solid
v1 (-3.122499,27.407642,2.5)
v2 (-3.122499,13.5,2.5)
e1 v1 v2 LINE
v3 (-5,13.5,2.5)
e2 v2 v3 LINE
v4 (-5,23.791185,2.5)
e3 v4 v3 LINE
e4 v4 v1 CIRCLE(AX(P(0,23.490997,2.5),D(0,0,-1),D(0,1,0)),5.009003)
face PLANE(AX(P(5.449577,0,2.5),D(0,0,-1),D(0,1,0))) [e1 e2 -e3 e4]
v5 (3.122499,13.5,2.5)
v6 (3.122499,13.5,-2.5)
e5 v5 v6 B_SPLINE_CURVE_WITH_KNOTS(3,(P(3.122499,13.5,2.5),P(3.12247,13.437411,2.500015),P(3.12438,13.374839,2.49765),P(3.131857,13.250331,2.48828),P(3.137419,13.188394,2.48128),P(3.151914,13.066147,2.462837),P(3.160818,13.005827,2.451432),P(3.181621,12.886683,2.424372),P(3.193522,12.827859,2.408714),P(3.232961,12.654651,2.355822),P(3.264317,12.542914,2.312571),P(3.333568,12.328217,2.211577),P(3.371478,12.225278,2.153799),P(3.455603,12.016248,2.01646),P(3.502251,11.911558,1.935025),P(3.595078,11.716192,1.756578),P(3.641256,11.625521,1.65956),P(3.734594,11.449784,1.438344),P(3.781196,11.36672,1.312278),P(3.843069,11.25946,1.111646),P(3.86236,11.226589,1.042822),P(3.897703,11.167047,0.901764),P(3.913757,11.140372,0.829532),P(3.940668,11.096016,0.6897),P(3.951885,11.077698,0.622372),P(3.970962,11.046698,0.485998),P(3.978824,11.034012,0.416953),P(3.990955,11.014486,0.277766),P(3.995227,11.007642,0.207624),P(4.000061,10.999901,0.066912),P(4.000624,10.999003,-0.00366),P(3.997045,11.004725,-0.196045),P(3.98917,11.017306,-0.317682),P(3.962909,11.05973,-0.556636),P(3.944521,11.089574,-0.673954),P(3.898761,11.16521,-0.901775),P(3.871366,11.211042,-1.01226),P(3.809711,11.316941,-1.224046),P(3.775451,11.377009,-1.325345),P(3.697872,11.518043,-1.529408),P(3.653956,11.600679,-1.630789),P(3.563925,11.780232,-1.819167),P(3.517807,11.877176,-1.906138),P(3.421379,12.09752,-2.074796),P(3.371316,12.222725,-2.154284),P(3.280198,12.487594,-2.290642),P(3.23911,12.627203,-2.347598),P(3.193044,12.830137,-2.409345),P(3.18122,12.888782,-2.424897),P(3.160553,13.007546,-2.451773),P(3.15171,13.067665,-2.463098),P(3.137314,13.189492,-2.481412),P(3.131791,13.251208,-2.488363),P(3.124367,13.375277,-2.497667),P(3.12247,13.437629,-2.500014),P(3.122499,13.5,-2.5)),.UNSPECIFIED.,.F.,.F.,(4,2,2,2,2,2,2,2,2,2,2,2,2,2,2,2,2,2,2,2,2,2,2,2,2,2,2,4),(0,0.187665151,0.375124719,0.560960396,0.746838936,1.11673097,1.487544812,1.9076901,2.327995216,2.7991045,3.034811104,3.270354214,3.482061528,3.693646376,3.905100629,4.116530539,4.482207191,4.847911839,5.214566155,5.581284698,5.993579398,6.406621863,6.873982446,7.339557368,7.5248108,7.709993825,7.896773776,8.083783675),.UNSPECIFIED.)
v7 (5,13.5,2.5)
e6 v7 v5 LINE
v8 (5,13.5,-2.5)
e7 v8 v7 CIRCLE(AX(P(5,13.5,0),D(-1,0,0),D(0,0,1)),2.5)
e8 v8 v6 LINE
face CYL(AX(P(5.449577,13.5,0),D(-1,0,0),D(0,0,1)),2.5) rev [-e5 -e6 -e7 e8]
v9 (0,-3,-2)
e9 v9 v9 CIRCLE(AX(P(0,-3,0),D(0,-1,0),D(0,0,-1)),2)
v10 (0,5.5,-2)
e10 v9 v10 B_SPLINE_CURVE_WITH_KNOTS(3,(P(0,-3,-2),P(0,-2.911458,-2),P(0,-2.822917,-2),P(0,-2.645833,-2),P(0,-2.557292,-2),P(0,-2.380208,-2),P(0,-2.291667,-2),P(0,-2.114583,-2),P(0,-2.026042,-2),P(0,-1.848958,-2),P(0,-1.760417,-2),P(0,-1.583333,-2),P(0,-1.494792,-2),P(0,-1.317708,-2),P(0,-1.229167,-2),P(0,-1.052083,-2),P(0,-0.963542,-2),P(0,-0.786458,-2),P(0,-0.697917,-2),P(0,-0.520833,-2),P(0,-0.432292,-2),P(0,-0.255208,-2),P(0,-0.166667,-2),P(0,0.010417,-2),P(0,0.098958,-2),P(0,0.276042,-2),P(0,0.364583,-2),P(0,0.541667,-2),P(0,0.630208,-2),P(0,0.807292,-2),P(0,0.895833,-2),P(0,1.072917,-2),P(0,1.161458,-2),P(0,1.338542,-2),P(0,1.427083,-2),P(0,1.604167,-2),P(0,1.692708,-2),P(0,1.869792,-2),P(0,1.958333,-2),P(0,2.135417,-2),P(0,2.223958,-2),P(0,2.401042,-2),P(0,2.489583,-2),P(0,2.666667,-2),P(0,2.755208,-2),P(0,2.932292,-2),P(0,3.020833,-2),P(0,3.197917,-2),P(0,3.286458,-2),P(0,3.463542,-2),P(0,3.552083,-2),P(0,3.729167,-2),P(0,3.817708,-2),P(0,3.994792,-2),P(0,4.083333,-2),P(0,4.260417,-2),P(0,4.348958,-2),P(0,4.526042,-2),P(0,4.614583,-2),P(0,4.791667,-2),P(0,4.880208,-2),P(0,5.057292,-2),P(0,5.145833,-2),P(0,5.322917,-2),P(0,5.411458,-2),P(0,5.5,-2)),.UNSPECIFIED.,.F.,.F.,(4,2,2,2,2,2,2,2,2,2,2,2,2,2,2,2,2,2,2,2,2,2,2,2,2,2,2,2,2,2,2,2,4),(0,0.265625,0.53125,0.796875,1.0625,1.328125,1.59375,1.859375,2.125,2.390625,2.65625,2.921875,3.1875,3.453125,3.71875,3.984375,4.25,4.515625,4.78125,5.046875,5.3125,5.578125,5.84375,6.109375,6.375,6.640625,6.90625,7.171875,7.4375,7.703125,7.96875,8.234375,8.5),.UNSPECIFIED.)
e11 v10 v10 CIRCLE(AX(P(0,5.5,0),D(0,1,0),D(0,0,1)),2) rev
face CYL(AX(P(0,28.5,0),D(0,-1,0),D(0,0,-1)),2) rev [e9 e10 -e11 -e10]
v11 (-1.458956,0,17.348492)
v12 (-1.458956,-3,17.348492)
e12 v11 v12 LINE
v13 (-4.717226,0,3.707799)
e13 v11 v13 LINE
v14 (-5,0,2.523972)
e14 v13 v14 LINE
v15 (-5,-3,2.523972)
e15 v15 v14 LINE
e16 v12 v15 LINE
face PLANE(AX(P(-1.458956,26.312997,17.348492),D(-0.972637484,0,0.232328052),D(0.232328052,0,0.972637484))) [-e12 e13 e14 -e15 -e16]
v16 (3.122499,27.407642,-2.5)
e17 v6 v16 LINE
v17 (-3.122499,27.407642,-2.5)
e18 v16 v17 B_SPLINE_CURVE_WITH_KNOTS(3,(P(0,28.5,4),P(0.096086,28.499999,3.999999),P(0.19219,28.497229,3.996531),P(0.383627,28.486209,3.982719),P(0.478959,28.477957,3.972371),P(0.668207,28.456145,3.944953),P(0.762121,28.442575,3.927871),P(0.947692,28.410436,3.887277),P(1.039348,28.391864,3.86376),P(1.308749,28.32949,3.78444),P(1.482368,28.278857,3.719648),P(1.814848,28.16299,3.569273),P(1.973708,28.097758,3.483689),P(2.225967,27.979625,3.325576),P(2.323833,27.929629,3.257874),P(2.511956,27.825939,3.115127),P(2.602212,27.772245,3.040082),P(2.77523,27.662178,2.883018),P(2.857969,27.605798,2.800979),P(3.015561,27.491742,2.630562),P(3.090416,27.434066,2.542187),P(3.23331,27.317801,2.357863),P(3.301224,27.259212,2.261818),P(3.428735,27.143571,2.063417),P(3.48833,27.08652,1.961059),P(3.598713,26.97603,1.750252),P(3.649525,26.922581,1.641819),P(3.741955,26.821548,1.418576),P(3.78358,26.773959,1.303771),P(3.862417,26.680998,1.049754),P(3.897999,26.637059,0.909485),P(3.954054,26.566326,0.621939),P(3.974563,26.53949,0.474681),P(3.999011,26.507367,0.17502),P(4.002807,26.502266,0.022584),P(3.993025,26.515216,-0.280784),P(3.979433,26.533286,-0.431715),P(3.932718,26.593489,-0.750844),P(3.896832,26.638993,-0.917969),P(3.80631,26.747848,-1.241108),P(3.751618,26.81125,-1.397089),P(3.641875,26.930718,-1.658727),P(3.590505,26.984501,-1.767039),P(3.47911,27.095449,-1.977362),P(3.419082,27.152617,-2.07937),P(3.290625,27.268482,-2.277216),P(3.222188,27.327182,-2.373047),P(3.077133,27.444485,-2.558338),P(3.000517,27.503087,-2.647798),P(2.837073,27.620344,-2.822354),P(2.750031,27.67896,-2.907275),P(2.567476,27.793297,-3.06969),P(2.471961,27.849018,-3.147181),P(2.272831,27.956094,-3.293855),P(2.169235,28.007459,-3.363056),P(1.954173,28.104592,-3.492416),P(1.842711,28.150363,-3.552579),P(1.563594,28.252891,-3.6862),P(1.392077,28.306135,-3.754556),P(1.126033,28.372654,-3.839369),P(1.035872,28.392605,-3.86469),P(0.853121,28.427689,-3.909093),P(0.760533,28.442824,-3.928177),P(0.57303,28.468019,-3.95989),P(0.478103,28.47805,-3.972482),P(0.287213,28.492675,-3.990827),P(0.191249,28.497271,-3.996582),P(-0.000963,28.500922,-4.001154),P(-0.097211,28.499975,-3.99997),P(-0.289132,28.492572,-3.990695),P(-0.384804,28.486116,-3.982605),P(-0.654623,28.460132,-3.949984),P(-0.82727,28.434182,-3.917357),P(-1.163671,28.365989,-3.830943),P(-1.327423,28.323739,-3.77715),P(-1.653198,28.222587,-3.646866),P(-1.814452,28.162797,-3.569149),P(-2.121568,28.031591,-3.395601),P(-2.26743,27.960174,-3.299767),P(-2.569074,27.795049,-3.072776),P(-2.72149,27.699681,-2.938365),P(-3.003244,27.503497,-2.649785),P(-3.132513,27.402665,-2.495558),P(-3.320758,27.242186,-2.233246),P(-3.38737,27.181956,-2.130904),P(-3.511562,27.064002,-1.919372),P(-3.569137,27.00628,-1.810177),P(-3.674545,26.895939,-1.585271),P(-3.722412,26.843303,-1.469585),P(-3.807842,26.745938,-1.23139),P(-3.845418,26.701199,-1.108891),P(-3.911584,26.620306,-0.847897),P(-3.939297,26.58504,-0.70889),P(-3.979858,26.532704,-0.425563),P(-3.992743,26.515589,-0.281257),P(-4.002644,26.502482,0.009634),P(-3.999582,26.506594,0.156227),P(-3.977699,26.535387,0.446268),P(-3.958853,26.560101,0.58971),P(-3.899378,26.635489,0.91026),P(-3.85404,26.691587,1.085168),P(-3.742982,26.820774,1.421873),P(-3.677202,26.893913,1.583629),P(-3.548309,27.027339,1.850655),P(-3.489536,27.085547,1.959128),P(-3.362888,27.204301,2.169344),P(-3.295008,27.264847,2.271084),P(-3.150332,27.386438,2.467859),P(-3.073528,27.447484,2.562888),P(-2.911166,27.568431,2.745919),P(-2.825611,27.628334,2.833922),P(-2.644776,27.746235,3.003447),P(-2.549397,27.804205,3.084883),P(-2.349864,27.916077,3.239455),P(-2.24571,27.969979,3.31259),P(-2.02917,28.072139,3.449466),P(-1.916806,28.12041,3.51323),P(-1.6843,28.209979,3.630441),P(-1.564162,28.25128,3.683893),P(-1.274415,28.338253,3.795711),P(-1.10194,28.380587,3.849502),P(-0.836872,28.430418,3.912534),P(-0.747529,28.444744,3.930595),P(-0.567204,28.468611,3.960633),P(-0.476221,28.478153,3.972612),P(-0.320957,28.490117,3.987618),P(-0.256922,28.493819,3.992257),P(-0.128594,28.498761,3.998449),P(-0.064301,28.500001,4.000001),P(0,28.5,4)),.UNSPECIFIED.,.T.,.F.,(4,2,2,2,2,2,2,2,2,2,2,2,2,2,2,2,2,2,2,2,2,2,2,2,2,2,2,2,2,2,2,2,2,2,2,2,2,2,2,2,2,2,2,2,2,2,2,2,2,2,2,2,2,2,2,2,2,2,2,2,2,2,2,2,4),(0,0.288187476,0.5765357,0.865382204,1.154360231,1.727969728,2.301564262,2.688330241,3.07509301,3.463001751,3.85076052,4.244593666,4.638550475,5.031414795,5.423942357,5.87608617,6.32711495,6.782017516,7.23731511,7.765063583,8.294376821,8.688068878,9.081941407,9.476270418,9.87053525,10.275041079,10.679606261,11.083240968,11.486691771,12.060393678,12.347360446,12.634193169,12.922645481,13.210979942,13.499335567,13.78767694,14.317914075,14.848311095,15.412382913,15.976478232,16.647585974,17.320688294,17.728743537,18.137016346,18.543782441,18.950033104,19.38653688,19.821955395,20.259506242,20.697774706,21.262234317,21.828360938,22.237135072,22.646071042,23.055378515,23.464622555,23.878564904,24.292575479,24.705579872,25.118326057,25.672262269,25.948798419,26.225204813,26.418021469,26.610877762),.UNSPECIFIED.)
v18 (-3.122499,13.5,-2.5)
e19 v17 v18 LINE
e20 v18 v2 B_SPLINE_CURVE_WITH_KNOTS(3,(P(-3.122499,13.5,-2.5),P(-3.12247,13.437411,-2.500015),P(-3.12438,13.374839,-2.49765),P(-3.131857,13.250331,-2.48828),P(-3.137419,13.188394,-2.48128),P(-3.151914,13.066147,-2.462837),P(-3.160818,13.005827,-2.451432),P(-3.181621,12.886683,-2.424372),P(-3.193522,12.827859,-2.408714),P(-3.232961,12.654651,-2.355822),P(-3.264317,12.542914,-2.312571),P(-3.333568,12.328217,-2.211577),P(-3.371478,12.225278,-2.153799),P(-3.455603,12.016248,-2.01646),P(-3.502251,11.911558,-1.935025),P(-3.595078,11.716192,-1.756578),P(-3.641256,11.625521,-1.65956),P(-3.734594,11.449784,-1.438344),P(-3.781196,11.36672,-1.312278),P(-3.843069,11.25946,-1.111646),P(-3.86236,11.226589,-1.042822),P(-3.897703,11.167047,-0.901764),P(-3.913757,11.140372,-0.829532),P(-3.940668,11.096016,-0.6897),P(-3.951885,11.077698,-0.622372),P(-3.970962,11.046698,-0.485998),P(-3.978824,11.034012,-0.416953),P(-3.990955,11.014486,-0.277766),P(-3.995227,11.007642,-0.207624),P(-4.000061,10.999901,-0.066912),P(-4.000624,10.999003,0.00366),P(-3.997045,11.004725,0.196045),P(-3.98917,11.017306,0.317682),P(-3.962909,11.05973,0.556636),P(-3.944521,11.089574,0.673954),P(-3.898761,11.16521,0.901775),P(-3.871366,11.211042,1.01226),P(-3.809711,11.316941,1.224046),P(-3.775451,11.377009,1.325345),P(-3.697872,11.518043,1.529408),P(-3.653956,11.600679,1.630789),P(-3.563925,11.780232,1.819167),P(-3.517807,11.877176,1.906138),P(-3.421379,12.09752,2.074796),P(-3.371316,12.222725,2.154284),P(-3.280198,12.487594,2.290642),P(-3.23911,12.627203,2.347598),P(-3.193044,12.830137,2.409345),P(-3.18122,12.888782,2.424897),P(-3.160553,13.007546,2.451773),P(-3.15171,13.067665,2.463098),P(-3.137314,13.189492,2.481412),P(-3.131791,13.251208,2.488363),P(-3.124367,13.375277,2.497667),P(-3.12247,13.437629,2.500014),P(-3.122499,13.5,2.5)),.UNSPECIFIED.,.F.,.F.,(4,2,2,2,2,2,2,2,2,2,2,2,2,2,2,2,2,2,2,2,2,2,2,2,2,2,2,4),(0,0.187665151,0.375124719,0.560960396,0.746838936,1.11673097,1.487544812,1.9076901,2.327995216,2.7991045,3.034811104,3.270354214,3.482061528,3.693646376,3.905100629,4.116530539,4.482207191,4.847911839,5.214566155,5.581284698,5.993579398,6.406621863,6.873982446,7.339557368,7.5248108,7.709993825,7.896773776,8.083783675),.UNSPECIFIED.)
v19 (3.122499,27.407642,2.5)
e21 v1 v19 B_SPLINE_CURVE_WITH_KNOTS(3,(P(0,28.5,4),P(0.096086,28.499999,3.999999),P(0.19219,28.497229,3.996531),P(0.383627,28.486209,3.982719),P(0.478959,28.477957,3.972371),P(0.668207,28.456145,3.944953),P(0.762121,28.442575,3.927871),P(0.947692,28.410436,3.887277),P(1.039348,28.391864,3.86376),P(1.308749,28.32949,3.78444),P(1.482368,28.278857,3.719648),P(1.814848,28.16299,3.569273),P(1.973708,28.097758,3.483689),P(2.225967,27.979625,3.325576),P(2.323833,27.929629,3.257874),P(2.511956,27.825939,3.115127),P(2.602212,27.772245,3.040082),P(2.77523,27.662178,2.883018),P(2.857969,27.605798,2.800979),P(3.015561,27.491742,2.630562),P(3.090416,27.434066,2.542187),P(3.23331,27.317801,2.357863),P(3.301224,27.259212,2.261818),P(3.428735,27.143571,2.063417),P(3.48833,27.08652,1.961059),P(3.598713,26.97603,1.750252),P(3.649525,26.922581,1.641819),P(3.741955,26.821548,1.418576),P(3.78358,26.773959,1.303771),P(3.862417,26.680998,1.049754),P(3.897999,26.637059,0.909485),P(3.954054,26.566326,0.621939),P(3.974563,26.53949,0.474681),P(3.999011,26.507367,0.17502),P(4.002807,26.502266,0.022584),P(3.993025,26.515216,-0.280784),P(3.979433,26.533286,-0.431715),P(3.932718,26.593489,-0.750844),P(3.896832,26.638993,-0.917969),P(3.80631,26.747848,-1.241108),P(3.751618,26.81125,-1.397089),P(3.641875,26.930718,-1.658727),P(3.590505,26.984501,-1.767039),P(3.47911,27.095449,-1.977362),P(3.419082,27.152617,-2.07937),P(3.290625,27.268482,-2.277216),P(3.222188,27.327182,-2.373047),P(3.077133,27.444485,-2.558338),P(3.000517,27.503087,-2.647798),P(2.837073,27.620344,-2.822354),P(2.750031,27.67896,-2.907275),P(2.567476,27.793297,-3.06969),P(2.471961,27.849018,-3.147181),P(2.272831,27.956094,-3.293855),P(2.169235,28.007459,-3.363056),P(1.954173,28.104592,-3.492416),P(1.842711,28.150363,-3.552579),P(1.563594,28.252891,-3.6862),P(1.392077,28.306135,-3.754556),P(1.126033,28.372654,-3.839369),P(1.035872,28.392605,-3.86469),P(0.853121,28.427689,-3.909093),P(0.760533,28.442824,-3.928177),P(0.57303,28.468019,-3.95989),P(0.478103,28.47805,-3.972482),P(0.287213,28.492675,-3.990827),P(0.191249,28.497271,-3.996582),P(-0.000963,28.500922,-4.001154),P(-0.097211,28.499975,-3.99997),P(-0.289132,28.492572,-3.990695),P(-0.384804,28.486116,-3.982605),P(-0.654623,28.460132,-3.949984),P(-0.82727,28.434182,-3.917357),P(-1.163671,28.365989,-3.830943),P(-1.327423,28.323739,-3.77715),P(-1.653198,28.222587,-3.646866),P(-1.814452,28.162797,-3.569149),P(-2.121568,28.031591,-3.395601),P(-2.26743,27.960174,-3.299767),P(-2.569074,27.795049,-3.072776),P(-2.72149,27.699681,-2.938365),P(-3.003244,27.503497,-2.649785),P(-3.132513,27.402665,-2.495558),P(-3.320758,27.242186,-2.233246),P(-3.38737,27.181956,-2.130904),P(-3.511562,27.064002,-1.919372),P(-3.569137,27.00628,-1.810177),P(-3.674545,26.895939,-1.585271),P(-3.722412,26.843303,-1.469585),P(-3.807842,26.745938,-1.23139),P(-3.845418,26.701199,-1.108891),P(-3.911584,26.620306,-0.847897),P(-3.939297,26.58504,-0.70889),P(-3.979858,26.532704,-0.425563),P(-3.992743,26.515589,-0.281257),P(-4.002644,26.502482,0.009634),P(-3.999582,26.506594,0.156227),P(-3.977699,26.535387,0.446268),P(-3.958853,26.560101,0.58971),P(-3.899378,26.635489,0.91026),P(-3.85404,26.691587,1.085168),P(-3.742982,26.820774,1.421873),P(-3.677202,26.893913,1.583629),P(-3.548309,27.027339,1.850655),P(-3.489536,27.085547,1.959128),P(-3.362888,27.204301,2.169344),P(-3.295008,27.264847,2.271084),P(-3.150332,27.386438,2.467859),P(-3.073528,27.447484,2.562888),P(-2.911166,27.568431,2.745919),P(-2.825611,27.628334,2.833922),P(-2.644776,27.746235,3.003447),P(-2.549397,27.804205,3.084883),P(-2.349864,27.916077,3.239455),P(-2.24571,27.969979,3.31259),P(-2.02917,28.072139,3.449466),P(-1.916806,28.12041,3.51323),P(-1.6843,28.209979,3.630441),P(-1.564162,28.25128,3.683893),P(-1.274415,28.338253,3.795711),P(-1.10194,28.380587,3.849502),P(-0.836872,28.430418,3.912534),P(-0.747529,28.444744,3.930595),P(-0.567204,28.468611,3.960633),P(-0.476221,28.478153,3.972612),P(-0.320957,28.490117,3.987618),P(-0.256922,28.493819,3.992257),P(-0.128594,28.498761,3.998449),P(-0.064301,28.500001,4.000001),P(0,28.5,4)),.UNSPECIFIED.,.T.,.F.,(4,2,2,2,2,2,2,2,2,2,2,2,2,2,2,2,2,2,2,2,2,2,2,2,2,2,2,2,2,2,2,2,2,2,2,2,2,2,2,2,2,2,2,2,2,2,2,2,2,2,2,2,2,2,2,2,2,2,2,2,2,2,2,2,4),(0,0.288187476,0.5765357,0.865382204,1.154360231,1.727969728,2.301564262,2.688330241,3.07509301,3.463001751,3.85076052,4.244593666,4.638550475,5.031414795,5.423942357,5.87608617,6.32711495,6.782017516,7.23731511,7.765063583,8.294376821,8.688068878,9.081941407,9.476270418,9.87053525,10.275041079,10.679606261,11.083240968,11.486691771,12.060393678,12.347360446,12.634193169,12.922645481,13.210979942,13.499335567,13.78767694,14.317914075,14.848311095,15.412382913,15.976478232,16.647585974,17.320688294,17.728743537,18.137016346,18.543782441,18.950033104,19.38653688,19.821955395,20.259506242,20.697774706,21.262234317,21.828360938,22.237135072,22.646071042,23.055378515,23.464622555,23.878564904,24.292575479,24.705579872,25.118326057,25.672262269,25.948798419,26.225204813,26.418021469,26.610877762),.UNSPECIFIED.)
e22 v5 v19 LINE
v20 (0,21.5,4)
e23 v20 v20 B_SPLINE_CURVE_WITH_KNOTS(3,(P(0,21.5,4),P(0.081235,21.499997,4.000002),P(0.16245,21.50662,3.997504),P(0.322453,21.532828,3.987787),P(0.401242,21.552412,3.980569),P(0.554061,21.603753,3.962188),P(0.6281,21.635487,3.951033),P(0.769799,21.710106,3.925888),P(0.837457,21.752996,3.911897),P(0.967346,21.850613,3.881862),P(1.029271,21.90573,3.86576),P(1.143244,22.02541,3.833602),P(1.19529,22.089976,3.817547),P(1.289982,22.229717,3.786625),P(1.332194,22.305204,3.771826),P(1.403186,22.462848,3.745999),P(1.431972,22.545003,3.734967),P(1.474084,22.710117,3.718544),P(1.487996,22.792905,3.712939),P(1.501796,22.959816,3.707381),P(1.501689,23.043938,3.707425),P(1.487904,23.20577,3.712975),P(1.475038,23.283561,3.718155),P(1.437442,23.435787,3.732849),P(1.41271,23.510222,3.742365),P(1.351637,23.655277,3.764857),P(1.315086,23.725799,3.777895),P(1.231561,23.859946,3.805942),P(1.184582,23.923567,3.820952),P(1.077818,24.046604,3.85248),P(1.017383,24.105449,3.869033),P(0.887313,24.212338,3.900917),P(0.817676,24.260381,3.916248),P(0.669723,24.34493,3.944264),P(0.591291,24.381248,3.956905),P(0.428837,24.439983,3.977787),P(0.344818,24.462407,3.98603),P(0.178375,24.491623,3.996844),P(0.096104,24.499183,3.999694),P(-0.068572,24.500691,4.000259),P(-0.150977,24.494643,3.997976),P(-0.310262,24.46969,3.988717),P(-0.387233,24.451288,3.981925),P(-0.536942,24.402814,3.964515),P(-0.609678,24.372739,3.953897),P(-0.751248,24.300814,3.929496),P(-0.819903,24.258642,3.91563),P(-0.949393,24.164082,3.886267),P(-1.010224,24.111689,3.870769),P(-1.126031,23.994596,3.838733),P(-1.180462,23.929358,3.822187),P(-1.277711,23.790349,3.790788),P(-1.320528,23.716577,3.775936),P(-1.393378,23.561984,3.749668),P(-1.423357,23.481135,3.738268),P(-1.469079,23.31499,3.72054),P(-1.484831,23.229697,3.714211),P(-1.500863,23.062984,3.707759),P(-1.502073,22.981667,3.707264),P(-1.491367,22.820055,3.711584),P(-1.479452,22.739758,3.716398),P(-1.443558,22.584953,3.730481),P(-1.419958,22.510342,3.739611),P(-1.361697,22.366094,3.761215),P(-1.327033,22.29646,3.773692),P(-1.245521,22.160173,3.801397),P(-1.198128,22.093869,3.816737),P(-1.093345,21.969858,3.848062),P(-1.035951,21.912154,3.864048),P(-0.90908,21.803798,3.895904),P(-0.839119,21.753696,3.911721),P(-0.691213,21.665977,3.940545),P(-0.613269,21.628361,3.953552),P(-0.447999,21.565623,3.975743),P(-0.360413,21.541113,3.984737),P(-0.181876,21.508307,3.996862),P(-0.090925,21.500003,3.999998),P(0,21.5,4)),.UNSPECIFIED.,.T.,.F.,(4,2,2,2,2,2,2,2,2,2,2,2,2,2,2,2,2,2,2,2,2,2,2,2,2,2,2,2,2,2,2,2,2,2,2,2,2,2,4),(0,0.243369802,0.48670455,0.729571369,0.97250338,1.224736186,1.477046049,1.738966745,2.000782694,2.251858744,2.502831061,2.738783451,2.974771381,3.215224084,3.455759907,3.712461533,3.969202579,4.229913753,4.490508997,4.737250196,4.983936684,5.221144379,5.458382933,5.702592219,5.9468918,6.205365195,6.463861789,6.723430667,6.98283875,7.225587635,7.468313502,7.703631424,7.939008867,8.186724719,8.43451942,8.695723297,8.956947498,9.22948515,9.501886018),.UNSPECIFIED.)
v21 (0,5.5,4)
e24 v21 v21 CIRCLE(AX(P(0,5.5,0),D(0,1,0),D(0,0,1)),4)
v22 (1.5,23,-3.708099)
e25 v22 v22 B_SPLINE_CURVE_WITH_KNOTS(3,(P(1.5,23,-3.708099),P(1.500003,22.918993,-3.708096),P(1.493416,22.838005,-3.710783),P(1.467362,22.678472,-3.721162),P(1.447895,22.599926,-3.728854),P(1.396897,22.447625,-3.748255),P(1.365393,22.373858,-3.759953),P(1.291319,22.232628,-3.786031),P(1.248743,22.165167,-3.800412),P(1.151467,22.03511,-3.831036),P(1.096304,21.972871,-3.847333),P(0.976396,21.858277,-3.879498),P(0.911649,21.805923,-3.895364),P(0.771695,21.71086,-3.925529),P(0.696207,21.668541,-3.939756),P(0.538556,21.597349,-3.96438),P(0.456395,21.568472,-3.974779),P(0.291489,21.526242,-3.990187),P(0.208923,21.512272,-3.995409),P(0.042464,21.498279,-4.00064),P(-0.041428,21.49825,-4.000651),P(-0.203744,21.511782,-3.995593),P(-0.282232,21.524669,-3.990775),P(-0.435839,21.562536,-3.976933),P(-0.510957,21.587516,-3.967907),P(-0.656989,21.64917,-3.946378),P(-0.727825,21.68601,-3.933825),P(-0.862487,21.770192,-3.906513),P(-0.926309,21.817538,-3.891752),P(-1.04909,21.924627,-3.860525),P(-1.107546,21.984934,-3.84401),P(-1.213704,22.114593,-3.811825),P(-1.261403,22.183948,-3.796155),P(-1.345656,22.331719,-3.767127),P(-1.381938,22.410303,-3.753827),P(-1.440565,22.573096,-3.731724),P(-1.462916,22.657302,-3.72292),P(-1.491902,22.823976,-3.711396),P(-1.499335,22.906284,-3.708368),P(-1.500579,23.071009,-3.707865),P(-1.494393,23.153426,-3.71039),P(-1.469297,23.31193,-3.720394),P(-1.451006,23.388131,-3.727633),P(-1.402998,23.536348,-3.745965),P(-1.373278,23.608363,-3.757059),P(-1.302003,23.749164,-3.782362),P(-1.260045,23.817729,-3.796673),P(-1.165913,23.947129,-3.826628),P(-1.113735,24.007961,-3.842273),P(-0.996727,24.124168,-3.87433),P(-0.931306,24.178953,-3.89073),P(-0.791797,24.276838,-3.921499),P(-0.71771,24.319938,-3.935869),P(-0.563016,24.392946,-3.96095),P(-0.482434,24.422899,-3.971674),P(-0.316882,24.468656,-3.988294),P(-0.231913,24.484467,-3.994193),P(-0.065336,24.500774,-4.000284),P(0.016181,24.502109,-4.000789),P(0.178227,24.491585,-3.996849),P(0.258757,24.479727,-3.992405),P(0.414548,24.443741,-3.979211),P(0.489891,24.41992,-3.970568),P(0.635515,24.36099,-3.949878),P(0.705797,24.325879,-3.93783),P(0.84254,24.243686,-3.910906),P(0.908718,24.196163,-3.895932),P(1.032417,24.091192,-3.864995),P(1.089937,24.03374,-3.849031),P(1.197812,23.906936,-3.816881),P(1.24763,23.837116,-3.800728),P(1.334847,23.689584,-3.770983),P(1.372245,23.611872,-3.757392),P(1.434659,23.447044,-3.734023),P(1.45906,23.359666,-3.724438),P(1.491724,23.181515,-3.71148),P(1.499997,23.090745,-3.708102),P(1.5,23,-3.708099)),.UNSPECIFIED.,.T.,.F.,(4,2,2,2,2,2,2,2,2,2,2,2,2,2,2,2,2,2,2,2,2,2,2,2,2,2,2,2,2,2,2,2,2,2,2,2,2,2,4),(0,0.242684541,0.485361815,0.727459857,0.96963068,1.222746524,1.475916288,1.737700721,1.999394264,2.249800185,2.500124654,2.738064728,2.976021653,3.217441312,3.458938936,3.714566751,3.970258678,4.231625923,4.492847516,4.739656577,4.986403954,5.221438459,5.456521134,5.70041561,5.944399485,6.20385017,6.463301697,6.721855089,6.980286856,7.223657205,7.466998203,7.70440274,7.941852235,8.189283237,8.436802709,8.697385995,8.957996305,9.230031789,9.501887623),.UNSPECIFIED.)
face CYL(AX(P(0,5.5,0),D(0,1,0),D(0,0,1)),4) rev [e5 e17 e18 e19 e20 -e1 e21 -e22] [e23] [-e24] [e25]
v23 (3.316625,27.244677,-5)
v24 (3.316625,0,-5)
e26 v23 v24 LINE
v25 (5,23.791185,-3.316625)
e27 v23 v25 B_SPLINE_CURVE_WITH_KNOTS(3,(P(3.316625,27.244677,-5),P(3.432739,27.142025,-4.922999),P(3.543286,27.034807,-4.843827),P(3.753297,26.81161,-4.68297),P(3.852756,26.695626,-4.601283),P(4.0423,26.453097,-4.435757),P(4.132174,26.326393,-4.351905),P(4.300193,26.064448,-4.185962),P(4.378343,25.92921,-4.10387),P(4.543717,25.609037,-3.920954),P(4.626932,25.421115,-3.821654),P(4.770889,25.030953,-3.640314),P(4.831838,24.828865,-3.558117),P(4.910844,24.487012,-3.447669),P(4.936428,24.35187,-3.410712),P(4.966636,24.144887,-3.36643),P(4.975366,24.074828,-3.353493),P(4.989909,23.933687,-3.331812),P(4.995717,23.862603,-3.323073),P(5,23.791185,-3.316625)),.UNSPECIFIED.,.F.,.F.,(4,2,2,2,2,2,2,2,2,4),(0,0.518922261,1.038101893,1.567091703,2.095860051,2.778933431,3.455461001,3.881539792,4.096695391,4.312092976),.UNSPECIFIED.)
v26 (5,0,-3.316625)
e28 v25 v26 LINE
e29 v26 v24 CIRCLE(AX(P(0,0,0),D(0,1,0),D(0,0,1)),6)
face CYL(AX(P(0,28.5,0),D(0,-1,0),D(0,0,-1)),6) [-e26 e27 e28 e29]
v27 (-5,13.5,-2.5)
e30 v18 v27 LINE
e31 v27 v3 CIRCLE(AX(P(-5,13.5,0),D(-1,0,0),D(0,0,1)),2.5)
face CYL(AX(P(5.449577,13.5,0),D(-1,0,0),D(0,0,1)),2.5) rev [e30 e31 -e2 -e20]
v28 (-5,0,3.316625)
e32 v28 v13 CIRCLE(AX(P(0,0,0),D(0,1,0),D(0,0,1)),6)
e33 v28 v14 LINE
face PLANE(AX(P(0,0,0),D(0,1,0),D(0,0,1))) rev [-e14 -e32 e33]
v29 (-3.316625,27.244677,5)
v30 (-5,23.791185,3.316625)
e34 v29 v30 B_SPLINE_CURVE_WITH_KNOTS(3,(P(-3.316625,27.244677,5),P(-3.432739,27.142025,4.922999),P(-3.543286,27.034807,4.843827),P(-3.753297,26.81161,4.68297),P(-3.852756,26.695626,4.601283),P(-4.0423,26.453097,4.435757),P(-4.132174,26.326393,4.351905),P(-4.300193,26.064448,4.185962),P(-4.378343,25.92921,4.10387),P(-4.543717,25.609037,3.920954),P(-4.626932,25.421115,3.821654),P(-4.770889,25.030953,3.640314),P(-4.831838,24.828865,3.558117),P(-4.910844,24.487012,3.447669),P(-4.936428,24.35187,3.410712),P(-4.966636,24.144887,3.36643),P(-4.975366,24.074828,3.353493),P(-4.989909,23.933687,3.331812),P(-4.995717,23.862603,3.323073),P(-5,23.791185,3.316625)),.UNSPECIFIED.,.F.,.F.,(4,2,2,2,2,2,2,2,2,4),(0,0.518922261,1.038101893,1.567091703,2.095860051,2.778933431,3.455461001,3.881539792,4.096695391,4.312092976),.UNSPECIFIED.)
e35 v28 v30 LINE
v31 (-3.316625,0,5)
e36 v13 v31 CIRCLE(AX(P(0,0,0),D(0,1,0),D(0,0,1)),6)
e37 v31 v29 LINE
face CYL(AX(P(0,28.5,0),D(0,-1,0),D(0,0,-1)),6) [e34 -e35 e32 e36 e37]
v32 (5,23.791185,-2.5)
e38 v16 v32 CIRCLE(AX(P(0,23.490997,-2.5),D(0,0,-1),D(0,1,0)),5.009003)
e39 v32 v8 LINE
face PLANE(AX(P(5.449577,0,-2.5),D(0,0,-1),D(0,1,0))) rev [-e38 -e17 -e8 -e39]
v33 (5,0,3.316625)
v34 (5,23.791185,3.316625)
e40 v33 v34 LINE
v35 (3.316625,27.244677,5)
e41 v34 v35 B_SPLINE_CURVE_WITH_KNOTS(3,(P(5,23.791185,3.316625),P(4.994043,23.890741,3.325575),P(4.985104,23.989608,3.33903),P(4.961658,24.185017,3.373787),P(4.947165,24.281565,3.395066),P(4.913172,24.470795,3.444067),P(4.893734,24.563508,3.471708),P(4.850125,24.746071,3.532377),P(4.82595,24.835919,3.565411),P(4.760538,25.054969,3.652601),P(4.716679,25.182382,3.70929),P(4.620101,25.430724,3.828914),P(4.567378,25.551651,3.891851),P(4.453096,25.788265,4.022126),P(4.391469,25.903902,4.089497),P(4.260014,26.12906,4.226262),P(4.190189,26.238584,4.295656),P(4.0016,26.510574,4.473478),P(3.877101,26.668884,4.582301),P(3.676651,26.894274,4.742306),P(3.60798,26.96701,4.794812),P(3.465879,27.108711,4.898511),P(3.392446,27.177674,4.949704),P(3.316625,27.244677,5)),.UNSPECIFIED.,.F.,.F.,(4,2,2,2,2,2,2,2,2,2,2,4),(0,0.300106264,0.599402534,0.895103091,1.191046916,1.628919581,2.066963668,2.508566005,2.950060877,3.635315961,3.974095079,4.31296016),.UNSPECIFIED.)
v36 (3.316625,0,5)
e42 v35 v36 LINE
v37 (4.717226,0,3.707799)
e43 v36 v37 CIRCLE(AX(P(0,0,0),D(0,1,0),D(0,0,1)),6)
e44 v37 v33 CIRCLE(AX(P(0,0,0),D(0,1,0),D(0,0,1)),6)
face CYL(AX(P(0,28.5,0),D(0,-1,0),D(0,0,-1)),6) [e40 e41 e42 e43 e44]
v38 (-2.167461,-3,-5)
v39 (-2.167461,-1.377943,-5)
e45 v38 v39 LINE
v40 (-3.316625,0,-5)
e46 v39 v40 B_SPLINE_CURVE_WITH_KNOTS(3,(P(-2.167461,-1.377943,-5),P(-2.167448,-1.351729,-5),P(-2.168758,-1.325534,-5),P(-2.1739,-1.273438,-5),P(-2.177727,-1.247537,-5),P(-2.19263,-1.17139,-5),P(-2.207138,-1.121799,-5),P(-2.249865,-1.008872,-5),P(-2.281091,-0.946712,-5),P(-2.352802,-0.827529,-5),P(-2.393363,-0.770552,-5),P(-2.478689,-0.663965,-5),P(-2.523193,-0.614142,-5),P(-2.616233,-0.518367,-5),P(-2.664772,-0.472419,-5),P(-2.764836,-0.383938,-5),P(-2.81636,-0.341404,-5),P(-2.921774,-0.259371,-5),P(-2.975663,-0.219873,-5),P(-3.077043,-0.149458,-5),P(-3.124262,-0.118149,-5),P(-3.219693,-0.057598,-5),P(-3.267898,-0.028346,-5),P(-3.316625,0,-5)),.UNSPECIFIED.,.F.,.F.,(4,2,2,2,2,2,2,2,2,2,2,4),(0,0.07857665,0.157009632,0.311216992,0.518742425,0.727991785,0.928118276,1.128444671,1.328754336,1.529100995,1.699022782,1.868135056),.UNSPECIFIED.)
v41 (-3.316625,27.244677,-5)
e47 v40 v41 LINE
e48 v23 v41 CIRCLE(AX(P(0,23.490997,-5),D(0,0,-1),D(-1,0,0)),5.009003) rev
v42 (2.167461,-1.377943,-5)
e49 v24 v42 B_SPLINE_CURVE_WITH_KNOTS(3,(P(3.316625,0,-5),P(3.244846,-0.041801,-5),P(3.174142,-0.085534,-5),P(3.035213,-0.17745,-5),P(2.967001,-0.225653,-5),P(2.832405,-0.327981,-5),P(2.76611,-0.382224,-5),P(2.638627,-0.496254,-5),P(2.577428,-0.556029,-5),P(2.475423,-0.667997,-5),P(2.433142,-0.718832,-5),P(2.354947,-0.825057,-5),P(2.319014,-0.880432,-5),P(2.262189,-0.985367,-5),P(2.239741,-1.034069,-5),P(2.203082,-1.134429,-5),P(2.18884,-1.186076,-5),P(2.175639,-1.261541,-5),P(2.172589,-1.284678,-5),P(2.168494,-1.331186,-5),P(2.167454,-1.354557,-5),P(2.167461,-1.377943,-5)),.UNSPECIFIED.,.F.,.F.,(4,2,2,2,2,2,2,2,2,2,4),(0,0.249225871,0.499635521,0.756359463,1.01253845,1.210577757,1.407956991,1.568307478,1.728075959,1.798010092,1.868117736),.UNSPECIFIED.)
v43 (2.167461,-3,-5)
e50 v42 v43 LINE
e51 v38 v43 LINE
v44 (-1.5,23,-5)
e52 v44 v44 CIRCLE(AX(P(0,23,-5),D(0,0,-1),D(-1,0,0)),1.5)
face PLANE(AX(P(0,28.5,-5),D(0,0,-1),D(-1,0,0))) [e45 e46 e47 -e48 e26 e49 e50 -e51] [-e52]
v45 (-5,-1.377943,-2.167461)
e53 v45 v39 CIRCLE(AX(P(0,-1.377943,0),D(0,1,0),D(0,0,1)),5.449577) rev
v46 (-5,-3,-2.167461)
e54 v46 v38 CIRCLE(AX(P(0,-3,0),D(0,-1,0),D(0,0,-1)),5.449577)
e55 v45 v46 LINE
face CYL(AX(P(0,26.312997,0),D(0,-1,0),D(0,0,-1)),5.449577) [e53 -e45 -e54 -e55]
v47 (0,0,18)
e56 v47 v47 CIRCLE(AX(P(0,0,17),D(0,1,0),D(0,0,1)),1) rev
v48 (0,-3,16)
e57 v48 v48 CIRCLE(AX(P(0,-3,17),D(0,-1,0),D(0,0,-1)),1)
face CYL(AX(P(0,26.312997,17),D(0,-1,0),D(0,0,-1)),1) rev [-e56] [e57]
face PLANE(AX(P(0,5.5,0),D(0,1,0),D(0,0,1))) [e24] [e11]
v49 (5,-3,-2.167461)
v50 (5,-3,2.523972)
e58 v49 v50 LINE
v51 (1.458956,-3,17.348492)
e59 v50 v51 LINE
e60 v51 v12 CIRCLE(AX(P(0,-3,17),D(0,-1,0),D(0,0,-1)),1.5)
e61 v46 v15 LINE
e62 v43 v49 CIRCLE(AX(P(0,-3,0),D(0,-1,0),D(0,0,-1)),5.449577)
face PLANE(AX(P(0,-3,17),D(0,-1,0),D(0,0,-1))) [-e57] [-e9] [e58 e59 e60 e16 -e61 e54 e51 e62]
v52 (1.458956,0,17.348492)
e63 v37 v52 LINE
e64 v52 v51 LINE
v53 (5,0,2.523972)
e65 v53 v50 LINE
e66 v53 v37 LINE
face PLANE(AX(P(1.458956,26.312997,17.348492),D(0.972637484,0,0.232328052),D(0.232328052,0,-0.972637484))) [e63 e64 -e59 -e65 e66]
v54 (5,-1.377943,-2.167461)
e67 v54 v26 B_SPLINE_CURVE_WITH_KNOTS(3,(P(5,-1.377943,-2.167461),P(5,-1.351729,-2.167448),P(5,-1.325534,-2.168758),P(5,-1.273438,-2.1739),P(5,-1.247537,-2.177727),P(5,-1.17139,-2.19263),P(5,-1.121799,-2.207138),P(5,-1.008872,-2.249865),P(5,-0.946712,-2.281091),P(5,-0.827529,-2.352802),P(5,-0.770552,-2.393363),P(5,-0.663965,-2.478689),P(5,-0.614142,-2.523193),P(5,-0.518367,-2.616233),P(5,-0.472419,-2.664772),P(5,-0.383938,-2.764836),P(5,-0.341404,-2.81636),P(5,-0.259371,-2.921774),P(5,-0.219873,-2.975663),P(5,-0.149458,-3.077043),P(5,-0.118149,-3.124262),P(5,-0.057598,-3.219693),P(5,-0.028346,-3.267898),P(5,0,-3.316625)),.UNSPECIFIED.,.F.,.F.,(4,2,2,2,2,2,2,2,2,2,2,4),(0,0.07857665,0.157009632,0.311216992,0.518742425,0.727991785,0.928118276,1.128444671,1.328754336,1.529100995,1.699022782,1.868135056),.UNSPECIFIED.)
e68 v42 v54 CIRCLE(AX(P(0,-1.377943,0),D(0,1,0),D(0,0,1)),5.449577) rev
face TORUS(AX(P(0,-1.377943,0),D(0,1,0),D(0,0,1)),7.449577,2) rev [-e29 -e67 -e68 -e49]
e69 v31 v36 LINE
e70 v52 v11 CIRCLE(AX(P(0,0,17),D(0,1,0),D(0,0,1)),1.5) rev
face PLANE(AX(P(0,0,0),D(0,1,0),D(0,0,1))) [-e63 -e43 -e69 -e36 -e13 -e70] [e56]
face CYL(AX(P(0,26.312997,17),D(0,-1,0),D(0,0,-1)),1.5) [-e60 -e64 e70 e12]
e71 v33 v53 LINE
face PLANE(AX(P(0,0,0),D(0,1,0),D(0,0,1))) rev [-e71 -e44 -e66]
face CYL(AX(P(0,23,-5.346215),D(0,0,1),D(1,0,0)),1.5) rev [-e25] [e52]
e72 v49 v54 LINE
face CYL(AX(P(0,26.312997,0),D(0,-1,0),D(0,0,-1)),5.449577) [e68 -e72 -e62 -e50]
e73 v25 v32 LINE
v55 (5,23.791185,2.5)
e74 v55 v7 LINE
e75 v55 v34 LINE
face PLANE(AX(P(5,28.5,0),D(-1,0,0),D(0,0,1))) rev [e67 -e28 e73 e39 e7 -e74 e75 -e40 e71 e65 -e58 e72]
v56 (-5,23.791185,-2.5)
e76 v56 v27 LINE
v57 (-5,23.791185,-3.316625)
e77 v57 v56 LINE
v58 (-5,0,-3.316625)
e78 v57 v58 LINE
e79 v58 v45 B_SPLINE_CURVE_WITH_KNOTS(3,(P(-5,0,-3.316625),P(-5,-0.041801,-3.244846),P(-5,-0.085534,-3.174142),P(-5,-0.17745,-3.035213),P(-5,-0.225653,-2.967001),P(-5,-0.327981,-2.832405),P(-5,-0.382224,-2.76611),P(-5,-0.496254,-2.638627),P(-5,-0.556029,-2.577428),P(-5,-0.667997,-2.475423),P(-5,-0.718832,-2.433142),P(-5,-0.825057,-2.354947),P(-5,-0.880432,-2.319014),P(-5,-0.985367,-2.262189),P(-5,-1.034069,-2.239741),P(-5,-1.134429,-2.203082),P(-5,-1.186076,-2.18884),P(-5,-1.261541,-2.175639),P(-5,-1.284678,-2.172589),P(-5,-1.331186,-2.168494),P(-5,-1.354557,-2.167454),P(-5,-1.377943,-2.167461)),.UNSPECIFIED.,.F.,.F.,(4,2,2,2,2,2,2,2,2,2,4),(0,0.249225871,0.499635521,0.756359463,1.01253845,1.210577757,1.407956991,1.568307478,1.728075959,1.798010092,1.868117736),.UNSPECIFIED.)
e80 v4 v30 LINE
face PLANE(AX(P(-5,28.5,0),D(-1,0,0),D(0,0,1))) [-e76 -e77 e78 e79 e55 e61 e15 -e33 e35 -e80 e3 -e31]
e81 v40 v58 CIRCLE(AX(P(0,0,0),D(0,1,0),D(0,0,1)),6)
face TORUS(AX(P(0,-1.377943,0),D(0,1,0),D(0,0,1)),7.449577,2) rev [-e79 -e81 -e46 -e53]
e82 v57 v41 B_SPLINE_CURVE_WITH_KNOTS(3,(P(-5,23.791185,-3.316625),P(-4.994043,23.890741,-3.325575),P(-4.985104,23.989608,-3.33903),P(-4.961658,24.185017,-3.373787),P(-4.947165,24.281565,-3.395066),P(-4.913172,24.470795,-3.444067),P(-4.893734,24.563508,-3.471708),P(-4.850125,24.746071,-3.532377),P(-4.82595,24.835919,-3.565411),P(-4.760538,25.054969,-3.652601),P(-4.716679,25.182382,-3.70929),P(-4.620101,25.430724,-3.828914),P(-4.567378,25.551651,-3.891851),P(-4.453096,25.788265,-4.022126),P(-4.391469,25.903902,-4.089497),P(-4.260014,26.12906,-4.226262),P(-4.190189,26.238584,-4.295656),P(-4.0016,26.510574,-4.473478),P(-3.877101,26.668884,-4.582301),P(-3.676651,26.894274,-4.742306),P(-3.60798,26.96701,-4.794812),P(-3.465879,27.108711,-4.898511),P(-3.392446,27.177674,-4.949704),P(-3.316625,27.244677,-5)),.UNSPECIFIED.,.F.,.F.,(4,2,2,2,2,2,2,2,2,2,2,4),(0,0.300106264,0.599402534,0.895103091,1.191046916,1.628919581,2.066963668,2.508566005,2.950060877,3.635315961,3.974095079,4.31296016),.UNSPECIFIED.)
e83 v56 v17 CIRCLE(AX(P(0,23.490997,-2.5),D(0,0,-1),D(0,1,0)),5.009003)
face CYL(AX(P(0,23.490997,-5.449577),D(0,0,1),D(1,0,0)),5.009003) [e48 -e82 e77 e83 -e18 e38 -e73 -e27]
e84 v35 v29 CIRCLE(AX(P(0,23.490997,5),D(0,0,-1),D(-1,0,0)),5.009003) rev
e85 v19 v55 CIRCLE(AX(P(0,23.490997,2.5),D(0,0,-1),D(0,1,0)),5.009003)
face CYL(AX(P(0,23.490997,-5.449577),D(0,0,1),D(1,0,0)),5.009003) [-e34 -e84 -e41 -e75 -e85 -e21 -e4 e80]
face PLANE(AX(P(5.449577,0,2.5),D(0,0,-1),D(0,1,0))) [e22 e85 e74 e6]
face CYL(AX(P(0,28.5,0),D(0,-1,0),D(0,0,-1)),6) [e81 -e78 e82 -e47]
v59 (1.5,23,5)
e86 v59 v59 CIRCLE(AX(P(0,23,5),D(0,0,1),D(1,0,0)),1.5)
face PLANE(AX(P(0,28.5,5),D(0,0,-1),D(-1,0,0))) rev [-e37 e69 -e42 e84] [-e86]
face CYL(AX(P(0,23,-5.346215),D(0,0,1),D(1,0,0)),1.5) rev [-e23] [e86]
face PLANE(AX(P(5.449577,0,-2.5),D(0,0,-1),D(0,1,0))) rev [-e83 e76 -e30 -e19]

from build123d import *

# Parameters (mm, degrees)
SKETCH1_R           = 6
SKETCH1_R_2         = 2
BOSS_EXTRUDE1_DEPTH = 28.5
SKETCH2_R           = 2
SKETCH2_R_2         = 1
BOSS_EXTRUDE2_DEPTH = 3
SKETCH3_R           = 4
CUT_EXTRUDE1_DEPTH  = 23
SKETCH4_W           = 13
SKETCH4_H           = 13
SKETCH4_W_2         = 10
SKETCH4_H_2         = 10
CUT_EXTRUDE2_DEPTH  = 35.503622998
CUT_EXTRUDE5_DEPTH  = 33.003091855
SKETCH9_W           = 5
SKETCH9_H           = 4.708815116
CUT_EXTRUDE6_DEPTH  = 36.548469223
CUT_EXTRUDE7_DEPTH  = 35.412176554
SKETCH11_R          = 1.5
CUT_EXTRUDE8_DEPTH  = 32.929610206
FILLET1_R           = 2


with BuildPart() as part:
    # Sketch1 → Boss-Extrude1 (new body)
    with BuildSketch(Plane(origin=(0, 0, 0), x_dir=(1, 0, 0), z_dir=(0, 1, 0))):
        with Locations(Location((0, 0, 0), (0, 0, 90))):
            Circle(SKETCH1_R)
        with Locations(Location((0, 0, 0), (0, 0, 90))):
            Circle(SKETCH1_R_2, mode=Mode.SUBTRACT)
    extrude(amount=BOSS_EXTRUDE1_DEPTH)

    # Sketch2 → Boss-Extrude2 (add)
    with BuildSketch(Plane(origin=(0, -3, 0), x_dir=(-1, 0, 0), z_dir=(0, -1, 0))):
        with BuildLine():
            Line((-1.458956227, -17.348492079), (-5.300462758, -1.266089585))
            ThreePointArc((-5.300462758, -1.266089585), (0, 5.449576891), (5.300462758, -1.266089585))
            Line((5.300462758, -1.266089585), (1.458956227, -17.348492079))
            ThreePointArc((1.458956227, -17.348492079), (0, -18.5), (-1.458956227, -17.348492079))
        make_face()
        with Locations(Location((0, 0, 0), (0, 0, 90))):
            Circle(SKETCH2_R, mode=Mode.SUBTRACT)
        with Locations(Location((0, -17, 0), (0, 0, 90))):
            Circle(SKETCH2_R_2, mode=Mode.SUBTRACT)
    extrude(amount=-BOSS_EXTRUDE2_DEPTH)

    # Sketch3 → Cut-Extrude1 (cut)
    with BuildSketch(Plane(origin=(0, 28.5, 0), x_dir=(1, 0, 0), z_dir=(0, 1, 0))):
        with Locations(Location((0, 0, 0), (0, 0, 270))):
            Circle(SKETCH3_R)
    extrude(amount=-CUT_EXTRUDE1_DEPTH, mode=Mode.SUBTRACT)

    # Sketch4 → Cut-Extrude2 (cut, through all)
    with BuildSketch(Plane(origin=(0, 0, 0), x_dir=(1, 0, 0), z_dir=(0, 1, 0))):
        Rectangle(SKETCH4_W, SKETCH4_H)
        Rectangle(SKETCH4_W_2, SKETCH4_H_2, mode=Mode.SUBTRACT)
    extrude(amount=CUT_EXTRUDE2_DEPTH, mode=Mode.SUBTRACT)

    # Sketch8 → Cut-Extrude5 (cut, through all)
    with BuildSketch(Plane.XY.offset(5)):
        with BuildLine():
            Line((-5, 23.791184884), (-6.441511966, 23.791184884))
            Line((-6.441511966, 23.791184884), (-6.441511966, 29.385647876))
            Line((-6.441511966, 29.385647876), (5.988439259, 29.385647876))
            Line((5.988439259, 29.385647876), (5.988439259, 23.791184884))
            Line((5.988439259, 23.791184884), (5, 23.791184884))
            ThreePointArc((5, 23.791184884), (0, 28.5), (-5, 23.791184884))
        make_face()
    extrude(amount=-CUT_EXTRUDE5_DEPTH, mode=Mode.SUBTRACT)

    # Sketch9 → Cut-Extrude6 (cut, through all)
    with BuildSketch(Plane.ZY.offset(5)):
        with Locations((0, 26.145592442)):
            Rectangle(SKETCH9_W, SKETCH9_H)
        with BuildLine():
            Line((2.5, 23.791184884), (-2.5, 23.791184884))
            Line((-2.5, 23.791184884), (-2.5, 13.5))
            ThreePointArc((-2.5, 13.5), (0, 11), (2.5, 13.5))
            Line((2.5, 13.5), (2.5, 23.791184884))
        make_face()
    extrude(amount=-CUT_EXTRUDE6_DEPTH, mode=Mode.SUBTRACT)

    # Sketch10 → Cut-Extrude7 (cut, through all)
    with BuildSketch(Plane(origin=(0, 0, 0), x_dir=(1, 0, 0), z_dir=(0, 1, 0))):
        Polygon((-5, 3.31662479), (-5, -3.31662479), (-6.387377767, -3.31662479), (-6.387377767, 5), (-6.387377767, 6.820918536), (6.983329281, 6.820918536), (6.983329281, -3.31662479), (5, -3.31662479), (5, 5), (-5, 5), align=None)
    extrude(amount=-CUT_EXTRUDE7_DEPTH, mode=Mode.SUBTRACT)

    # Sketch11 → Cut-Extrude8 (cut, through all)
    with BuildSketch(Plane.XY.offset(5)):
        with Locations((0, 23)):
            Circle(SKETCH11_R)
    extrude(amount=-CUT_EXTRUDE8_DEPTH, mode=Mode.SUBTRACT)

    # Fillet1
    # the kernel refuses this fillet: 2 mm, written as the material it adds along each edge
    with BuildSketch(Plane(origin=(0, 0, 0), x_dir=(0.9752052541729319, 0, 0.22130230959822164), z_dir=(-0.22130230959822164, 0, 0.9752052541729319))) as fillet1_piece_1_section:
        with BuildLine():
            CenterArc((7.449576891, -1.377942973), FILLET1_R, 136.451251834, 43.548748166)
            Line((5.449576891, -1.377942973), (5.409576891, -1.377942973))
            Line((5.409576891, -1.377942973), (5.409576891, 0))
            Line((5.409576891, 0), (5.449576891, 0.04))
            ThreePointArc((5.449576891, 0.04), (5.724788445, 0.04), (5.971008462, 0.027558859))
            Line((5.971008462, 0.027558859), (6, 0))
        make_face()
    fillet1_piece_1 = revolve(axis=Axis((0, 0, 0), (0, 1, 0)), revolution_arc=115.571070831, mode=Mode.PRIVATE)
    fillet1_piece_1 = split(fillet1_piece_1, bisect_by=Plane(origin=(5, -0.397015398, -3.862769036), z_dir=(-1, 0, 0)), keep=Keep.TOP, mode=Mode.PRIVATE)
    fillet1_piece_1 = split(fillet1_piece_1, bisect_by=Plane(origin=(3.862770037, -0.397015398, -5), z_dir=(0, 0, 1)), keep=Keep.TOP, mode=Mode.PRIVATE)
    add(fillet1_piece_1)
    with BuildSketch(Plane(origin=(0, 0, 0), x_dir=(0.221302309598303, 0, -0.9752052541729136), z_dir=(0.9752052541729136, 0, 0.221302309598303))) as fillet1_piece_2_section:
        with BuildLine():
            CenterArc((7.449576891, -1.377942973), FILLET1_R, 136.451251834, 43.548748166)
            Line((6, 0), (5.971008462, 0.027558859))
            ThreePointArc((5.971008462, 0.027558859), (5.724788445, 0.04), (5.449576891, 0.04))
            Line((5.449576891, 0.04), (5.409576891, 0))
            Line((5.409576891, 0), (5.409576891, -1.377942973))
            Line((5.409576891, -1.377942973), (5.449576891, -1.377942973))
        make_face()
    fillet1_piece_2 = revolve(axis=Axis((0, 0, 0), (0, 1, 0)), revolution_arc=115.571070831, mode=Mode.PRIVATE)
    fillet1_piece_2 = split(fillet1_piece_2, bisect_by=Plane(origin=(-3.862770028, -0.397015251, -5), z_dir=(0, 0, 1)), keep=Keep.TOP, mode=Mode.PRIVATE)
    fillet1_piece_2 = split(fillet1_piece_2, bisect_by=Plane(origin=(-5, -0.397015251, -3.862769283), z_dir=(1, 0, 0)), keep=Keep.TOP, mode=Mode.PRIVATE)
    add(fillet1_piece_2)


solid = part.part
